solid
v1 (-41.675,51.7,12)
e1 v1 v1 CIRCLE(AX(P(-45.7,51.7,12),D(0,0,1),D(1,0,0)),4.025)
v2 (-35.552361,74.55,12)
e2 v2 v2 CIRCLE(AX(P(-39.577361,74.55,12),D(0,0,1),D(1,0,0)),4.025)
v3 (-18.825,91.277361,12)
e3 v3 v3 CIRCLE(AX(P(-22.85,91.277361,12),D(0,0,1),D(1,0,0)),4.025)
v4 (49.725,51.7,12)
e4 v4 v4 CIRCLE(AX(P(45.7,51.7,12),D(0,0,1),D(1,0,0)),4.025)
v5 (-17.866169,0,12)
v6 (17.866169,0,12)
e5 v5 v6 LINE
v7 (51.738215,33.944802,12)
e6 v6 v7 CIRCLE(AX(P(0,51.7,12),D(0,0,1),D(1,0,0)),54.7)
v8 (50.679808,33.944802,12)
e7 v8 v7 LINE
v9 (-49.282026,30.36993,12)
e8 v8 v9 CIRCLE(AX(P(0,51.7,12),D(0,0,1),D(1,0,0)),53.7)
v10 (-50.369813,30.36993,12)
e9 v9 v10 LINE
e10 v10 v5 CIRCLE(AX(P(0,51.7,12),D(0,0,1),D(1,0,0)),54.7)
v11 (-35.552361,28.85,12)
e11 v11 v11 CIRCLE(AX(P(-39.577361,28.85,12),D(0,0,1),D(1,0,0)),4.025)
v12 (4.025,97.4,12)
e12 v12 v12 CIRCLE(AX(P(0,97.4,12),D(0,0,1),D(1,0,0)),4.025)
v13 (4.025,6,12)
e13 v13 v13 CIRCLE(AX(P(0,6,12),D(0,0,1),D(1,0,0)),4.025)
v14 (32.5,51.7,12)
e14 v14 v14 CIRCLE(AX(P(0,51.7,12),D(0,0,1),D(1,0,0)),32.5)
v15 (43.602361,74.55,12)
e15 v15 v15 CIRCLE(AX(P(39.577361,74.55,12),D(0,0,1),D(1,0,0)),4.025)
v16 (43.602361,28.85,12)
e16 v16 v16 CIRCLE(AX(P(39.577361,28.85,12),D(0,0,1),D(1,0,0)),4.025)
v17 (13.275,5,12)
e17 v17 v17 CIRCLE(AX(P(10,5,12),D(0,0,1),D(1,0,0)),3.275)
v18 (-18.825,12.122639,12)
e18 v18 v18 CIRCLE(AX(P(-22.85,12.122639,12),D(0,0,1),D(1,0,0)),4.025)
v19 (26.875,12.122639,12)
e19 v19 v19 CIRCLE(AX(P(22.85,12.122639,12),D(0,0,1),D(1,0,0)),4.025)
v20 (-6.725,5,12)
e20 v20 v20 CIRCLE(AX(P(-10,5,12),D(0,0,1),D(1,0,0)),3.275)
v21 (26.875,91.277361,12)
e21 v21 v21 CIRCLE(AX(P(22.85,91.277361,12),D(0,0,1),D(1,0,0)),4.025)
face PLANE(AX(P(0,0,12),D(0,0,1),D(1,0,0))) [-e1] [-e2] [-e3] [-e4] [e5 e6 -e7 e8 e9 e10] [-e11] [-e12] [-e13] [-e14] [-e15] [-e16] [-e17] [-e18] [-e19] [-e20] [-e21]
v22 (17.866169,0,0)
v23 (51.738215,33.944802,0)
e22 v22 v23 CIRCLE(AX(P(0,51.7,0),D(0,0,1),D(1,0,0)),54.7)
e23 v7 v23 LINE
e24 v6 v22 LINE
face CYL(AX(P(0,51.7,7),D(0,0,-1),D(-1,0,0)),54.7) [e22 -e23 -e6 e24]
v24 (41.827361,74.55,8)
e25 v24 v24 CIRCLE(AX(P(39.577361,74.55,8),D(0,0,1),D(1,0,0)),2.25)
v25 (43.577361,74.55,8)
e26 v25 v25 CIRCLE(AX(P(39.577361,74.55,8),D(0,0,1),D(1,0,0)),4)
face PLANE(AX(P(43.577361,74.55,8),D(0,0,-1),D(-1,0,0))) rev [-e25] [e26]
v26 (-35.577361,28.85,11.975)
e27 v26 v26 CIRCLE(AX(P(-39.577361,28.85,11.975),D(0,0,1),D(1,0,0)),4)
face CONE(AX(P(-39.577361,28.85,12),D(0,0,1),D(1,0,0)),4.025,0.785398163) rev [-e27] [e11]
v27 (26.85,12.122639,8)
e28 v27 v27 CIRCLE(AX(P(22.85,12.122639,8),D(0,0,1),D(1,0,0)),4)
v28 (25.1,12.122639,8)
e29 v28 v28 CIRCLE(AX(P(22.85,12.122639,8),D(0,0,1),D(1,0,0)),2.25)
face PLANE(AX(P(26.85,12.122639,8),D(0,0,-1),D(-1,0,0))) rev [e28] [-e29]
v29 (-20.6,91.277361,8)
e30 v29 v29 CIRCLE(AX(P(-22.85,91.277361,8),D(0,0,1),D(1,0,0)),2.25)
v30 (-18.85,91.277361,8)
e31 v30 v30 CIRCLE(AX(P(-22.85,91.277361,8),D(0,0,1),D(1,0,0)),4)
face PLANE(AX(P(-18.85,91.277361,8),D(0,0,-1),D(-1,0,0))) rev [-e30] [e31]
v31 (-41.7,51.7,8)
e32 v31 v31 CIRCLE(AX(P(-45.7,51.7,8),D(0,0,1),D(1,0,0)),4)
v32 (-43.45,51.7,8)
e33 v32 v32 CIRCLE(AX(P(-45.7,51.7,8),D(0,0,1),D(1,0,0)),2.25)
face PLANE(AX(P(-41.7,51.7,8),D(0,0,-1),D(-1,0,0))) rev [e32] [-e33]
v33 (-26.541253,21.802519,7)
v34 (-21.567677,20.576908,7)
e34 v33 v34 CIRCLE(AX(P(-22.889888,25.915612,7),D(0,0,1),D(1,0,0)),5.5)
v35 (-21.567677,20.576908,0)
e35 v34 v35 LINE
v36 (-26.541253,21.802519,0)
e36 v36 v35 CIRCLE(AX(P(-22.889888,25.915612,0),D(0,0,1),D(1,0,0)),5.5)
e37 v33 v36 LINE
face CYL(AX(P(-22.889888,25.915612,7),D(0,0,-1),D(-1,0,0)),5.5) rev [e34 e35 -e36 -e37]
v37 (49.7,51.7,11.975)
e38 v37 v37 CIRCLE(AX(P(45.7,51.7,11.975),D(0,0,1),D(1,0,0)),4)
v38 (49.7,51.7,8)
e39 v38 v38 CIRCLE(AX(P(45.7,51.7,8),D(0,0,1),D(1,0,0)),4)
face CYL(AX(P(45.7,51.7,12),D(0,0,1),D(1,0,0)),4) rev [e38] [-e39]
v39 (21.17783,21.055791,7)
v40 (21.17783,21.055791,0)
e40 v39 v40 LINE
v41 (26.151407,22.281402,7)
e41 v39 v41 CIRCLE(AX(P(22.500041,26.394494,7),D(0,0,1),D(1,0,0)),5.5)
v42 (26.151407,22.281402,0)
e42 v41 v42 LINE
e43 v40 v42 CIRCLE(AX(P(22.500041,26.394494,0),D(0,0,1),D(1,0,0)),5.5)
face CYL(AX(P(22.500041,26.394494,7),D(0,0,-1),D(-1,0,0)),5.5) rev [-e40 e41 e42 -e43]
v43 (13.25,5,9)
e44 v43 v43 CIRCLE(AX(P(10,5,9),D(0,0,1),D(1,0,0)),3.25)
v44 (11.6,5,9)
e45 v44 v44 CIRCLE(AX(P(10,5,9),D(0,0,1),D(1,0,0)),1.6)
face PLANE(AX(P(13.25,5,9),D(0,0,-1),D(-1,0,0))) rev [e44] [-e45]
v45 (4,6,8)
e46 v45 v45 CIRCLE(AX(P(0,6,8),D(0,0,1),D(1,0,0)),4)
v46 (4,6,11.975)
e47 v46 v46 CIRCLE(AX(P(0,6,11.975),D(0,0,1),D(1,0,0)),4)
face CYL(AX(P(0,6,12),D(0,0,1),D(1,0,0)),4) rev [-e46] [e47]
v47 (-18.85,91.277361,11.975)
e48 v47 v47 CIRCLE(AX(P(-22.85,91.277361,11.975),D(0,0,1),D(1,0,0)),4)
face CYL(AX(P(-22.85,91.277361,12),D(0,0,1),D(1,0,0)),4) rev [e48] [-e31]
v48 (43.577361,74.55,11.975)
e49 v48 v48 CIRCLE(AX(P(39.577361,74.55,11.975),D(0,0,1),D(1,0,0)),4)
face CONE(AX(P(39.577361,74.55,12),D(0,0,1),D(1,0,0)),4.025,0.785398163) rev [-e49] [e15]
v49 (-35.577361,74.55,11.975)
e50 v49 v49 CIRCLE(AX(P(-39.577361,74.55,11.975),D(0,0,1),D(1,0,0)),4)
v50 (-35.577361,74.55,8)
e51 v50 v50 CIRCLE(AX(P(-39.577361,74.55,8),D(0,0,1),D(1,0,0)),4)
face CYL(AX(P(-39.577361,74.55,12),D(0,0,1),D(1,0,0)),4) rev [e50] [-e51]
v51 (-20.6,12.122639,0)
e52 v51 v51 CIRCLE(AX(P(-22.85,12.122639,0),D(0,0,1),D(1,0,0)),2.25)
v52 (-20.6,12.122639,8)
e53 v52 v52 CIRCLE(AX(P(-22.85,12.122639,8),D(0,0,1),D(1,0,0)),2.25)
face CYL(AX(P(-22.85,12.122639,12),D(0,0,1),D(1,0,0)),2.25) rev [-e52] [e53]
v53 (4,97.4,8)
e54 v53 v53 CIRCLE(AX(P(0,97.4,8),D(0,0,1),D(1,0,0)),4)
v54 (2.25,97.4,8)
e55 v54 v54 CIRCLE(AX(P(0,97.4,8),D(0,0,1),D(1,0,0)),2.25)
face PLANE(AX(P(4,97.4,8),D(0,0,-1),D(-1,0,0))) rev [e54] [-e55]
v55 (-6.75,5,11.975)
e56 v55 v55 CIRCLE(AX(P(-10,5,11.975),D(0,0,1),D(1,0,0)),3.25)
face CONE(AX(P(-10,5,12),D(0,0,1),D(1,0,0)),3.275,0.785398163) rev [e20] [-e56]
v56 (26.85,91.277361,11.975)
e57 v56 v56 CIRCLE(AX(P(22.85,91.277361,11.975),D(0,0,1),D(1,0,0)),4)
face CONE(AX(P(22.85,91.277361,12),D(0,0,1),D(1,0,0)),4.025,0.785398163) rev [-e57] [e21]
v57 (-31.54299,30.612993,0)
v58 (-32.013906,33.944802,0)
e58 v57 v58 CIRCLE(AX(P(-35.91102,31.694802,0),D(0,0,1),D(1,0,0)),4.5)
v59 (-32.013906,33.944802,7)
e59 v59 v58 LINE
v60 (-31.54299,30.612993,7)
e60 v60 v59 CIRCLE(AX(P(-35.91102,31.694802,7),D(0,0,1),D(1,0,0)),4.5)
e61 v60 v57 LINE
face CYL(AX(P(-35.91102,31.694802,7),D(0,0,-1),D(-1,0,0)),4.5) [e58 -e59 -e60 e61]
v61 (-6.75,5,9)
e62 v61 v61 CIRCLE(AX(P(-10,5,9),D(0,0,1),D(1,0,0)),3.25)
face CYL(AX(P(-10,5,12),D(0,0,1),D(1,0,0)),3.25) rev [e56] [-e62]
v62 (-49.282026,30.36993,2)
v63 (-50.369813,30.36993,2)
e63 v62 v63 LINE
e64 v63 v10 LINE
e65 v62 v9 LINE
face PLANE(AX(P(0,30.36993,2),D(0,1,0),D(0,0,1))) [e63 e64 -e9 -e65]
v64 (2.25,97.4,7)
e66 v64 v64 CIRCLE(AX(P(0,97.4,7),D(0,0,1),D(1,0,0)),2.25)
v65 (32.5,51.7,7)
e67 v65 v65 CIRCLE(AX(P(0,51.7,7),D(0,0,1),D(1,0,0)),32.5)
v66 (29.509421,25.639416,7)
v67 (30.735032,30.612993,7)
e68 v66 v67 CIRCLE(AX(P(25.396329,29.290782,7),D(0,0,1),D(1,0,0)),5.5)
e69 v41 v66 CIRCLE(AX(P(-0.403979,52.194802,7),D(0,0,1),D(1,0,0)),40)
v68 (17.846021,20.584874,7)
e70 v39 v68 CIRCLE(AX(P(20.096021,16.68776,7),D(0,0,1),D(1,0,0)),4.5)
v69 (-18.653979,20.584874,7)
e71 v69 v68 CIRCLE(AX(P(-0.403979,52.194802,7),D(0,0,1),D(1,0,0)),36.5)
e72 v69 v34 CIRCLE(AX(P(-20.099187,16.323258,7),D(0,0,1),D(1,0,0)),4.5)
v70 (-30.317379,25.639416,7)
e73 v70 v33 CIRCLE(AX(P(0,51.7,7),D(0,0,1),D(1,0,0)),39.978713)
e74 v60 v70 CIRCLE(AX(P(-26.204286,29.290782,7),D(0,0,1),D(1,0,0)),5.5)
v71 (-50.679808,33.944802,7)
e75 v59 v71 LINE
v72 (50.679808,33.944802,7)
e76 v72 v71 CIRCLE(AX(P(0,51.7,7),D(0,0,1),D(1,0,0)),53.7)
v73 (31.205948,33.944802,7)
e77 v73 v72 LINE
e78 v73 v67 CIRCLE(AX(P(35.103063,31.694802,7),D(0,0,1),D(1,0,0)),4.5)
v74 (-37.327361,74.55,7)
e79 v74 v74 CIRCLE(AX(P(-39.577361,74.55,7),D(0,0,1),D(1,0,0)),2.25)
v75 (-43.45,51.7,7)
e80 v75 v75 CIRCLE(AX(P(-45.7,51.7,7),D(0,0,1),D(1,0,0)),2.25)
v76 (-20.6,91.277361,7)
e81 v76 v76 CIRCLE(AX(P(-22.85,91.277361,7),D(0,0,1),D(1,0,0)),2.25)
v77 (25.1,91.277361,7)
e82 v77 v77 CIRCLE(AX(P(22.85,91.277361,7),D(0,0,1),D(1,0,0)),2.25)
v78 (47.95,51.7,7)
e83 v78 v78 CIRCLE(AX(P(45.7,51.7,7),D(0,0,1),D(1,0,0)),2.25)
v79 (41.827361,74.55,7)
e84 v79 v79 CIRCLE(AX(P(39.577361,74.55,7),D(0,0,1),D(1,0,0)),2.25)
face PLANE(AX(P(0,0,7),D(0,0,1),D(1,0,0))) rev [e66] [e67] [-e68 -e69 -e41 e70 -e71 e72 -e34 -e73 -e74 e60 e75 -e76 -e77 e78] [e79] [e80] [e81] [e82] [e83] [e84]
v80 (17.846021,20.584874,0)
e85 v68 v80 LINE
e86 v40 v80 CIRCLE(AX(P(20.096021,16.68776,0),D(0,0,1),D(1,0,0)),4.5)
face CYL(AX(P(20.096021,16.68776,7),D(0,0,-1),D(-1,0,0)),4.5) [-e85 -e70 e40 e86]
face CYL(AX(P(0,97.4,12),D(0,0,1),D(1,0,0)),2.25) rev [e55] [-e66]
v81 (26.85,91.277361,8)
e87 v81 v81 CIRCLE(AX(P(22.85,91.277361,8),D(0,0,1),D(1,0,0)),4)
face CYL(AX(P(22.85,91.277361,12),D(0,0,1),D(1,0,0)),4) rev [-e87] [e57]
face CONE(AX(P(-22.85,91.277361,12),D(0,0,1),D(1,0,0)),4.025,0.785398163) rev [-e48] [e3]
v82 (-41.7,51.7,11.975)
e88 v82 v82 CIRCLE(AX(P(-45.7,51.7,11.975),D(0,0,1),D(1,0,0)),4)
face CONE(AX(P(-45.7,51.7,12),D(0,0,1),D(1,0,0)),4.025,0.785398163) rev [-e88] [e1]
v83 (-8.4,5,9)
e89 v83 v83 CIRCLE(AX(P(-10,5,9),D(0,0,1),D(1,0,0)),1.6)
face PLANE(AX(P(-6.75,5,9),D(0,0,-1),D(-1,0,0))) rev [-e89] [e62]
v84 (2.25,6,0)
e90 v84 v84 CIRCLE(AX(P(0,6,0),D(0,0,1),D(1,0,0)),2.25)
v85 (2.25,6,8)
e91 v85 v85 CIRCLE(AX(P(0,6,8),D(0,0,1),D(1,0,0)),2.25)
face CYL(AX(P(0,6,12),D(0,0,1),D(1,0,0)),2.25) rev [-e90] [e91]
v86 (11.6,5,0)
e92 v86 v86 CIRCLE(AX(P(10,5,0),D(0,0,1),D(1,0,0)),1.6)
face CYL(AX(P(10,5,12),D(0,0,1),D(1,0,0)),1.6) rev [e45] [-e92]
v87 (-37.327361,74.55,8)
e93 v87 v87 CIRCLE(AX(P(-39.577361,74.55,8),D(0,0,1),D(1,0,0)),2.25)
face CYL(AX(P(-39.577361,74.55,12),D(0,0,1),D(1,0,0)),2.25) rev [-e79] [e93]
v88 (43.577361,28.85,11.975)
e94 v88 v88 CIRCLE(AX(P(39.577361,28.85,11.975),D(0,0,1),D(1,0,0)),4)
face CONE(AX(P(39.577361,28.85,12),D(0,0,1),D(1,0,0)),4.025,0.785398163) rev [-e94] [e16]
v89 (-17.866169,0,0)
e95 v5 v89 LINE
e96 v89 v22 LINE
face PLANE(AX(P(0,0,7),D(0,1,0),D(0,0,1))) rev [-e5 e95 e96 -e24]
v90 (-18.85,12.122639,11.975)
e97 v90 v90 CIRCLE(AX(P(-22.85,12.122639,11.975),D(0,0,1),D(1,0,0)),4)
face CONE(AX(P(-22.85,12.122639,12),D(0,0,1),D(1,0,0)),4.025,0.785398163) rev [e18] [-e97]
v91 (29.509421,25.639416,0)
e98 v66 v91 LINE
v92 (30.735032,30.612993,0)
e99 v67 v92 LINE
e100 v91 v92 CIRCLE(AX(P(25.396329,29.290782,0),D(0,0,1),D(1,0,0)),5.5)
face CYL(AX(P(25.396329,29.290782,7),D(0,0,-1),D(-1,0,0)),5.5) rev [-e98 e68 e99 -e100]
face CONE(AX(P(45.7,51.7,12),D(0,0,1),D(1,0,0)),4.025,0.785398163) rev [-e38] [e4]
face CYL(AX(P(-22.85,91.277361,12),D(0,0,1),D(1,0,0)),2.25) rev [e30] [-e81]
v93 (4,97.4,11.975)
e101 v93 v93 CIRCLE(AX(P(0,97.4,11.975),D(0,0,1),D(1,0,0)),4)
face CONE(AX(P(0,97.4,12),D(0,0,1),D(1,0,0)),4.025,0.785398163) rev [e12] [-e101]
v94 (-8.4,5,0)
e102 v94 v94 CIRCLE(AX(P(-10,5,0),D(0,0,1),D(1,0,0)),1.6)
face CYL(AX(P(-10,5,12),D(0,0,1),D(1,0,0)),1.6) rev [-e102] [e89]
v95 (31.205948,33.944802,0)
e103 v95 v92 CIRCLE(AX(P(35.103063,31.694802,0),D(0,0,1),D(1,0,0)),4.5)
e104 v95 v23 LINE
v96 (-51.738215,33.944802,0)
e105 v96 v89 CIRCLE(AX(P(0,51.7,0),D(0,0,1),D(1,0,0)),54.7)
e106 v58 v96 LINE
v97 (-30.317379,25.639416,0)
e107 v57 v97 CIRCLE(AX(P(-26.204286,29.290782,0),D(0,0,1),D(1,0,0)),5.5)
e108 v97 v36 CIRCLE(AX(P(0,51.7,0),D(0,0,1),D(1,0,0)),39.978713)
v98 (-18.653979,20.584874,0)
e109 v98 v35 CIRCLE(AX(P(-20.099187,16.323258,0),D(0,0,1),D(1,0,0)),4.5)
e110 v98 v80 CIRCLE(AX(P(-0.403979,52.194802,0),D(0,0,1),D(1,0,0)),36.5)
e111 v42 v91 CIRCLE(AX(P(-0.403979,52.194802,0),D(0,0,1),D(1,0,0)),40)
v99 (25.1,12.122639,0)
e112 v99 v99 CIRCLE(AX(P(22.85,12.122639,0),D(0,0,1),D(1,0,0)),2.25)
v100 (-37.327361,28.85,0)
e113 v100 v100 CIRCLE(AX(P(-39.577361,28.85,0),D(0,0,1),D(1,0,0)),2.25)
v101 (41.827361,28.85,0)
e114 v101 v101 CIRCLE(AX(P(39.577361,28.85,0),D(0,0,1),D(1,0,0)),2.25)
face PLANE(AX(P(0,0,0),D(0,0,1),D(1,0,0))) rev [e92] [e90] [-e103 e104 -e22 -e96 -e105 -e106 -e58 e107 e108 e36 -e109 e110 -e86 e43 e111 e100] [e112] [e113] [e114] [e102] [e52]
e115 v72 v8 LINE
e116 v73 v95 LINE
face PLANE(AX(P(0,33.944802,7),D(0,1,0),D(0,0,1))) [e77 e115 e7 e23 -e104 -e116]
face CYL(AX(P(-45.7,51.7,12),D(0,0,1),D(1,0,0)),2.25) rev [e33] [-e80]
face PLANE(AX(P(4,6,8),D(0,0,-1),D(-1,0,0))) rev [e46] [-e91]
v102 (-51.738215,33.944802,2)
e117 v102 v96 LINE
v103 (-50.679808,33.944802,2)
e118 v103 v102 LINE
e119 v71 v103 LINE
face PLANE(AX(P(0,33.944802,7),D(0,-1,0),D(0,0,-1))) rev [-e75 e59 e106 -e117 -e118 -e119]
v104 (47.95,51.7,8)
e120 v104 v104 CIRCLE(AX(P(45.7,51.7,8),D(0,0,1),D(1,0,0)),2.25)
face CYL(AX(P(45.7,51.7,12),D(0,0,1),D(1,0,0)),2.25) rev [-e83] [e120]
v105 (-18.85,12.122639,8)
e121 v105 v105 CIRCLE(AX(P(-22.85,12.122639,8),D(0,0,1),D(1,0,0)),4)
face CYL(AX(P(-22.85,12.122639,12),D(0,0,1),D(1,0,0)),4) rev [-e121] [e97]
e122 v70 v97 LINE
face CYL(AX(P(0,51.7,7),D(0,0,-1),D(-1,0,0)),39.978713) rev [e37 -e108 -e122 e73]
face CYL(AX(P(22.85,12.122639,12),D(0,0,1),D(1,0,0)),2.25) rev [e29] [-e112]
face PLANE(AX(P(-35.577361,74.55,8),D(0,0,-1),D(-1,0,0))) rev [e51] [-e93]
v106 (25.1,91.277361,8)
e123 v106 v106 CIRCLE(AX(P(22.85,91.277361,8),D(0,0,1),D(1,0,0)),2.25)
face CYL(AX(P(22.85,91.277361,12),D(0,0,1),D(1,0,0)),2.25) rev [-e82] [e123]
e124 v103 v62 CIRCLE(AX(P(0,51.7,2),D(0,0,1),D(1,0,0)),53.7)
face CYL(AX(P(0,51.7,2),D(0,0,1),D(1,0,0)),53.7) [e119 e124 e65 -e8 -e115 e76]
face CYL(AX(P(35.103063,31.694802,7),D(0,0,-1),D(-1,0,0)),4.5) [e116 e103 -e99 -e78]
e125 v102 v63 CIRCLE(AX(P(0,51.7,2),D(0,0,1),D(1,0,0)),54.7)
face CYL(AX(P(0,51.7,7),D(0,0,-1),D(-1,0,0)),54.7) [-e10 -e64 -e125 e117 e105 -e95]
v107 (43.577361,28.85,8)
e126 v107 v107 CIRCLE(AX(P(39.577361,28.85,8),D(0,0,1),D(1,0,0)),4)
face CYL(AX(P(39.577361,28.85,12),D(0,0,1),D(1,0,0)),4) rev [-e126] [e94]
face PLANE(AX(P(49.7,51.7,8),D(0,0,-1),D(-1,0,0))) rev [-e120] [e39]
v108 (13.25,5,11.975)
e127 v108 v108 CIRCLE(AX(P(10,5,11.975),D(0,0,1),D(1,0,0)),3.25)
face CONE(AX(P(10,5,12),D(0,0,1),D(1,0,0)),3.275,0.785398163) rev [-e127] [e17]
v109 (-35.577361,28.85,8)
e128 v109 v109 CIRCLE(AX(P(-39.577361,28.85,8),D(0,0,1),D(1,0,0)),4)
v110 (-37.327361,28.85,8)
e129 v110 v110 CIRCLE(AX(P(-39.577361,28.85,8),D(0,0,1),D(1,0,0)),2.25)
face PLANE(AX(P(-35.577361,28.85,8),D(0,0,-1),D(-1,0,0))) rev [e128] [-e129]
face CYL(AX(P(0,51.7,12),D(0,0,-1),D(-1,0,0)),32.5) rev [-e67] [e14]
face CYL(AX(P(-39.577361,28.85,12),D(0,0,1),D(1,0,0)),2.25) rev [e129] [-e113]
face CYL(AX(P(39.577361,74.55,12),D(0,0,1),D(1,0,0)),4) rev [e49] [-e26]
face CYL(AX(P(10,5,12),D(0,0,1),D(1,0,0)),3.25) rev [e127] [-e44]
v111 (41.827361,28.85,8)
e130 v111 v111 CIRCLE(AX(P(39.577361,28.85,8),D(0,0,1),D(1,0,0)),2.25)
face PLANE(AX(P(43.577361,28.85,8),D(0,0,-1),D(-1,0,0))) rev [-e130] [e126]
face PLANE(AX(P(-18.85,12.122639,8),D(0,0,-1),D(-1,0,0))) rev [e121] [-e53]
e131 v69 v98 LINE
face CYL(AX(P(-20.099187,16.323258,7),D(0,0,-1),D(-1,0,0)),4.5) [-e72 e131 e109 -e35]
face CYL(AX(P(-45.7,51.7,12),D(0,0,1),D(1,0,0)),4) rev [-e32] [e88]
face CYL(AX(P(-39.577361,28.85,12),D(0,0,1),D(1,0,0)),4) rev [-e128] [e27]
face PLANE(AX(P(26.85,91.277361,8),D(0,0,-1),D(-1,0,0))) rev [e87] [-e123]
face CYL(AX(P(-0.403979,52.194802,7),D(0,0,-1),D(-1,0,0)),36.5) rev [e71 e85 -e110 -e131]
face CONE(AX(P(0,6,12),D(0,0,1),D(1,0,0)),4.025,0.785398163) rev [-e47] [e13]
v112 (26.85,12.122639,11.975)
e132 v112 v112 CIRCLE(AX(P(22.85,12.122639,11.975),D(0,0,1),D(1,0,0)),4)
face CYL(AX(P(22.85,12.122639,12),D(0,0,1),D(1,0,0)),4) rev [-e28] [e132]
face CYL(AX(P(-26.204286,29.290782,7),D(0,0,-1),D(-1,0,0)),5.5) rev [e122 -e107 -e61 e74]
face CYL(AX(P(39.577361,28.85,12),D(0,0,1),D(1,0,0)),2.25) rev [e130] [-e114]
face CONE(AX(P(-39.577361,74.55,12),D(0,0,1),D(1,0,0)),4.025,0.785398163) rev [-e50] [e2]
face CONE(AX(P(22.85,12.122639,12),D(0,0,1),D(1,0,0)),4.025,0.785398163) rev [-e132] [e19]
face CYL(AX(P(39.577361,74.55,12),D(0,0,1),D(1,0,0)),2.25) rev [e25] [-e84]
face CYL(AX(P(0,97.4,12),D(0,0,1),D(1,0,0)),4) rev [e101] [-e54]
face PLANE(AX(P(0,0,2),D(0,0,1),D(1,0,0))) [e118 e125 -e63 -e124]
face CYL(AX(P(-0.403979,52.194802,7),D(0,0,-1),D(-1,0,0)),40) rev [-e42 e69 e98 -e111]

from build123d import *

# Parameters (mm, degrees)
BOSS_EXTRUDE1_DEPTH     = 7
BOSS_EXTRUDE2_OUTLINE_R = 32.5
BOSS_EXTRUDE2_DEPTH     = 5
CUT_EXTRUDE1_START      = -10
CUT_EXTRUDE1_DEPTH      = 10
CIRPATTERN1_COUNT       = 12


# Read off the part's stored shape, not the designer's step: Boss-Extrude2, CBORE for M3 SHCS1
with BuildPart() as part:
    # Sketch1 → Boss-Extrude1 (new body)
    with BuildSketch(Plane.XY):
        with BuildLine():
            Line((0, 0), (-0.403978912, 15.69480172))
            ThreePointArc((-0.403978912, 15.69480172), (-9.850874058, 16.938509061), (-18.653978912, 20.584874482))
            ThreePointArc((-18.653978912, 20.584874482), (-20.11149054, 20.82324131), (-21.567676923, 20.576907974))
            ThreePointArc((-21.567676923, 20.576907974), (-24.205855638, 20.575365577), (-26.541253498, 21.802519254))
            ThreePointArc((-26.541253498, 21.802519254), (-28.493972378, 23.657335535), (-30.31737883, 25.639416102))
            ThreePointArc((-30.31737883, 25.639416102), (-31.544532507, 27.974813962), (-31.54299011, 30.612992677))
            ThreePointArc((-31.54299011, 30.612992677), (-31.455305934, 32.324569937), (-32.01390615, 33.94480172))
            Line((-32.01390615, 33.94480172), (-51.738215412, 33.94480172))
            ThreePointArc((-51.738215412, 33.94480172), (-38.72021408, 13.062776736), (-17.866169147, 0))
            Line((-17.866169147, 0), (0, 0))
        make_face()
        with BuildLine():
            ThreePointArc((17.846021088, 20.584874482), (9.042916235, 16.938509061), (-0.403978912, 15.69480172))
            Line((-0.403978912, 15.69480172), (0, 0))
            Line((0, 0), (17.866169147, 0))
            ThreePointArc((17.866169147, 0), (38.72021408, 13.062776736), (51.738215412, 33.94480172))
            Line((51.738215412, 33.94480172), (31.205948327, 33.94480172))
            ThreePointArc((31.205948327, 33.94480172), (30.756396425, 32.859487423), (30.603062644, 31.69480172))
            ThreePointArc((30.603062644, 31.69480172), (30.636176894, 31.149887325), (30.735032287, 30.612992677))
            ThreePointArc((30.735032287, 30.612992677), (30.855855546, 29.956788108), (30.896328518, 29.290781625))
            ThreePointArc((30.896328518, 29.290781625), (30.537924024, 27.337836245), (29.509421007, 25.639416102))
            ThreePointArc((29.509421007, 25.639416102), (27.880292336, 23.910530473), (26.151406706, 22.281401802))
            ThreePointArc((26.151406706, 22.281401802), (23.816008846, 21.054248125), (21.177830131, 21.055790522))
            ThreePointArc((21.177830131, 21.055790522), (19.466252872, 21.143474697), (17.846021088, 20.584874482))
        make_face()
    extrude(amount=BOSS_EXTRUDE1_DEPTH)

    # Boss-Extrude2 outline → Boss-Extrude2 (add)
    with BuildSketch(Plane.XY.offset(7)):
        with BuildLine():
            Line((-17.866169147, 0), (17.866169147, 0))
            ThreePointArc((17.866169147, 0), (0, 106.4), (-17.866169147, 0))
        make_face()
        with Locations((0, 51.7)):
            Circle(BOSS_EXTRUDE2_OUTLINE_R, mode=Mode.SUBTRACT)
    extrude(amount=BOSS_EXTRUDE2_DEPTH)

    # Sketch4 → Cut-Extrude1 (cut)
    with BuildSketch(Plane.XY.offset(12).offset(CUT_EXTRUDE1_START)):
        with BuildLine():
            ThreePointArc((51.738215412, 33.94480172), (-1.913911899, 106.366506576), (-50.369813341, 30.369929583))
            Line((-50.369813341, 30.369929583), (-49.282026095, 30.369929583))
            ThreePointArc((-49.282026095, 30.369929583), (-1.919212398, 105.365693173), (50.679807952, 33.94480172))
            Line((50.679807952, 33.94480172), (51.738215412, 33.94480172))
        make_face()
    extrude(amount=CUT_EXTRUDE1_DEPTH, mode=Mode.SUBTRACT)

    # CBORE for M3 SHCS1 outline → CBORE for M3 SHCS1 (revolve, cut)
    with BuildSketch(Plane(origin=(10, 5, 0), x_dir=(1, 0, 0), z_dir=(0, -1, 0))):
        Polygon((0, 0), (1.6, 0), (1.6, 9), (3.25, 9), (3.25, 11.975), (3.275, 12), (0, 12), align=None)
    revolve(axis=Axis((10, 5, 0), (0, 0, 1)), mode=Mode.SUBTRACT)

    # CBORE for M3 SHCS1 2 outline → CBORE for M3 SHCS1 2 (revolve, cut)
    with BuildSketch(Plane(origin=(-10, 5, 0), x_dir=(1, 0, 0), z_dir=(0, -1, 0))):
        Polygon((0, 12), (0, 0), (1.6, 0), (1.6, 9), (3.25, 9), (3.25, 11.975), (3.275, 12), align=None)
    revolve(axis=Axis((-10, 5, 0), (0, 0, 1)), mode=Mode.SUBTRACT)

    # Sketch10 → CBORE for M4 SHCS2 (revolve, cut)
    with BuildSketch(Plane(origin=(0, 97.4, 12), x_dir=(0, -1, 0), z_dir=(1, 0, 0))):
        Polygon((0, 0), (0, 12), (2.25, 12), (2.25, 4), (4, 4), (4, 0.025), (4.025, 0), align=None)
    cbore_for_m4_shcs2 = revolve(axis=Axis((0, 97.4, 18.35), (0, 0, -1)), mode=Mode.SUBTRACT)

    # CirPattern1: CBORE for M4 SHCS2 ×12 about axis
    cirpattern1_axis = Axis((0, 51.7, 0), (0, 0, 1))
    for i in range(1, CIRPATTERN1_COUNT):
        add(cbore_for_m4_shcs2.rotate(cirpattern1_axis, i * 360 / CIRPATTERN1_COUNT), mode=Mode.SUBTRACT)


solid = part.part
